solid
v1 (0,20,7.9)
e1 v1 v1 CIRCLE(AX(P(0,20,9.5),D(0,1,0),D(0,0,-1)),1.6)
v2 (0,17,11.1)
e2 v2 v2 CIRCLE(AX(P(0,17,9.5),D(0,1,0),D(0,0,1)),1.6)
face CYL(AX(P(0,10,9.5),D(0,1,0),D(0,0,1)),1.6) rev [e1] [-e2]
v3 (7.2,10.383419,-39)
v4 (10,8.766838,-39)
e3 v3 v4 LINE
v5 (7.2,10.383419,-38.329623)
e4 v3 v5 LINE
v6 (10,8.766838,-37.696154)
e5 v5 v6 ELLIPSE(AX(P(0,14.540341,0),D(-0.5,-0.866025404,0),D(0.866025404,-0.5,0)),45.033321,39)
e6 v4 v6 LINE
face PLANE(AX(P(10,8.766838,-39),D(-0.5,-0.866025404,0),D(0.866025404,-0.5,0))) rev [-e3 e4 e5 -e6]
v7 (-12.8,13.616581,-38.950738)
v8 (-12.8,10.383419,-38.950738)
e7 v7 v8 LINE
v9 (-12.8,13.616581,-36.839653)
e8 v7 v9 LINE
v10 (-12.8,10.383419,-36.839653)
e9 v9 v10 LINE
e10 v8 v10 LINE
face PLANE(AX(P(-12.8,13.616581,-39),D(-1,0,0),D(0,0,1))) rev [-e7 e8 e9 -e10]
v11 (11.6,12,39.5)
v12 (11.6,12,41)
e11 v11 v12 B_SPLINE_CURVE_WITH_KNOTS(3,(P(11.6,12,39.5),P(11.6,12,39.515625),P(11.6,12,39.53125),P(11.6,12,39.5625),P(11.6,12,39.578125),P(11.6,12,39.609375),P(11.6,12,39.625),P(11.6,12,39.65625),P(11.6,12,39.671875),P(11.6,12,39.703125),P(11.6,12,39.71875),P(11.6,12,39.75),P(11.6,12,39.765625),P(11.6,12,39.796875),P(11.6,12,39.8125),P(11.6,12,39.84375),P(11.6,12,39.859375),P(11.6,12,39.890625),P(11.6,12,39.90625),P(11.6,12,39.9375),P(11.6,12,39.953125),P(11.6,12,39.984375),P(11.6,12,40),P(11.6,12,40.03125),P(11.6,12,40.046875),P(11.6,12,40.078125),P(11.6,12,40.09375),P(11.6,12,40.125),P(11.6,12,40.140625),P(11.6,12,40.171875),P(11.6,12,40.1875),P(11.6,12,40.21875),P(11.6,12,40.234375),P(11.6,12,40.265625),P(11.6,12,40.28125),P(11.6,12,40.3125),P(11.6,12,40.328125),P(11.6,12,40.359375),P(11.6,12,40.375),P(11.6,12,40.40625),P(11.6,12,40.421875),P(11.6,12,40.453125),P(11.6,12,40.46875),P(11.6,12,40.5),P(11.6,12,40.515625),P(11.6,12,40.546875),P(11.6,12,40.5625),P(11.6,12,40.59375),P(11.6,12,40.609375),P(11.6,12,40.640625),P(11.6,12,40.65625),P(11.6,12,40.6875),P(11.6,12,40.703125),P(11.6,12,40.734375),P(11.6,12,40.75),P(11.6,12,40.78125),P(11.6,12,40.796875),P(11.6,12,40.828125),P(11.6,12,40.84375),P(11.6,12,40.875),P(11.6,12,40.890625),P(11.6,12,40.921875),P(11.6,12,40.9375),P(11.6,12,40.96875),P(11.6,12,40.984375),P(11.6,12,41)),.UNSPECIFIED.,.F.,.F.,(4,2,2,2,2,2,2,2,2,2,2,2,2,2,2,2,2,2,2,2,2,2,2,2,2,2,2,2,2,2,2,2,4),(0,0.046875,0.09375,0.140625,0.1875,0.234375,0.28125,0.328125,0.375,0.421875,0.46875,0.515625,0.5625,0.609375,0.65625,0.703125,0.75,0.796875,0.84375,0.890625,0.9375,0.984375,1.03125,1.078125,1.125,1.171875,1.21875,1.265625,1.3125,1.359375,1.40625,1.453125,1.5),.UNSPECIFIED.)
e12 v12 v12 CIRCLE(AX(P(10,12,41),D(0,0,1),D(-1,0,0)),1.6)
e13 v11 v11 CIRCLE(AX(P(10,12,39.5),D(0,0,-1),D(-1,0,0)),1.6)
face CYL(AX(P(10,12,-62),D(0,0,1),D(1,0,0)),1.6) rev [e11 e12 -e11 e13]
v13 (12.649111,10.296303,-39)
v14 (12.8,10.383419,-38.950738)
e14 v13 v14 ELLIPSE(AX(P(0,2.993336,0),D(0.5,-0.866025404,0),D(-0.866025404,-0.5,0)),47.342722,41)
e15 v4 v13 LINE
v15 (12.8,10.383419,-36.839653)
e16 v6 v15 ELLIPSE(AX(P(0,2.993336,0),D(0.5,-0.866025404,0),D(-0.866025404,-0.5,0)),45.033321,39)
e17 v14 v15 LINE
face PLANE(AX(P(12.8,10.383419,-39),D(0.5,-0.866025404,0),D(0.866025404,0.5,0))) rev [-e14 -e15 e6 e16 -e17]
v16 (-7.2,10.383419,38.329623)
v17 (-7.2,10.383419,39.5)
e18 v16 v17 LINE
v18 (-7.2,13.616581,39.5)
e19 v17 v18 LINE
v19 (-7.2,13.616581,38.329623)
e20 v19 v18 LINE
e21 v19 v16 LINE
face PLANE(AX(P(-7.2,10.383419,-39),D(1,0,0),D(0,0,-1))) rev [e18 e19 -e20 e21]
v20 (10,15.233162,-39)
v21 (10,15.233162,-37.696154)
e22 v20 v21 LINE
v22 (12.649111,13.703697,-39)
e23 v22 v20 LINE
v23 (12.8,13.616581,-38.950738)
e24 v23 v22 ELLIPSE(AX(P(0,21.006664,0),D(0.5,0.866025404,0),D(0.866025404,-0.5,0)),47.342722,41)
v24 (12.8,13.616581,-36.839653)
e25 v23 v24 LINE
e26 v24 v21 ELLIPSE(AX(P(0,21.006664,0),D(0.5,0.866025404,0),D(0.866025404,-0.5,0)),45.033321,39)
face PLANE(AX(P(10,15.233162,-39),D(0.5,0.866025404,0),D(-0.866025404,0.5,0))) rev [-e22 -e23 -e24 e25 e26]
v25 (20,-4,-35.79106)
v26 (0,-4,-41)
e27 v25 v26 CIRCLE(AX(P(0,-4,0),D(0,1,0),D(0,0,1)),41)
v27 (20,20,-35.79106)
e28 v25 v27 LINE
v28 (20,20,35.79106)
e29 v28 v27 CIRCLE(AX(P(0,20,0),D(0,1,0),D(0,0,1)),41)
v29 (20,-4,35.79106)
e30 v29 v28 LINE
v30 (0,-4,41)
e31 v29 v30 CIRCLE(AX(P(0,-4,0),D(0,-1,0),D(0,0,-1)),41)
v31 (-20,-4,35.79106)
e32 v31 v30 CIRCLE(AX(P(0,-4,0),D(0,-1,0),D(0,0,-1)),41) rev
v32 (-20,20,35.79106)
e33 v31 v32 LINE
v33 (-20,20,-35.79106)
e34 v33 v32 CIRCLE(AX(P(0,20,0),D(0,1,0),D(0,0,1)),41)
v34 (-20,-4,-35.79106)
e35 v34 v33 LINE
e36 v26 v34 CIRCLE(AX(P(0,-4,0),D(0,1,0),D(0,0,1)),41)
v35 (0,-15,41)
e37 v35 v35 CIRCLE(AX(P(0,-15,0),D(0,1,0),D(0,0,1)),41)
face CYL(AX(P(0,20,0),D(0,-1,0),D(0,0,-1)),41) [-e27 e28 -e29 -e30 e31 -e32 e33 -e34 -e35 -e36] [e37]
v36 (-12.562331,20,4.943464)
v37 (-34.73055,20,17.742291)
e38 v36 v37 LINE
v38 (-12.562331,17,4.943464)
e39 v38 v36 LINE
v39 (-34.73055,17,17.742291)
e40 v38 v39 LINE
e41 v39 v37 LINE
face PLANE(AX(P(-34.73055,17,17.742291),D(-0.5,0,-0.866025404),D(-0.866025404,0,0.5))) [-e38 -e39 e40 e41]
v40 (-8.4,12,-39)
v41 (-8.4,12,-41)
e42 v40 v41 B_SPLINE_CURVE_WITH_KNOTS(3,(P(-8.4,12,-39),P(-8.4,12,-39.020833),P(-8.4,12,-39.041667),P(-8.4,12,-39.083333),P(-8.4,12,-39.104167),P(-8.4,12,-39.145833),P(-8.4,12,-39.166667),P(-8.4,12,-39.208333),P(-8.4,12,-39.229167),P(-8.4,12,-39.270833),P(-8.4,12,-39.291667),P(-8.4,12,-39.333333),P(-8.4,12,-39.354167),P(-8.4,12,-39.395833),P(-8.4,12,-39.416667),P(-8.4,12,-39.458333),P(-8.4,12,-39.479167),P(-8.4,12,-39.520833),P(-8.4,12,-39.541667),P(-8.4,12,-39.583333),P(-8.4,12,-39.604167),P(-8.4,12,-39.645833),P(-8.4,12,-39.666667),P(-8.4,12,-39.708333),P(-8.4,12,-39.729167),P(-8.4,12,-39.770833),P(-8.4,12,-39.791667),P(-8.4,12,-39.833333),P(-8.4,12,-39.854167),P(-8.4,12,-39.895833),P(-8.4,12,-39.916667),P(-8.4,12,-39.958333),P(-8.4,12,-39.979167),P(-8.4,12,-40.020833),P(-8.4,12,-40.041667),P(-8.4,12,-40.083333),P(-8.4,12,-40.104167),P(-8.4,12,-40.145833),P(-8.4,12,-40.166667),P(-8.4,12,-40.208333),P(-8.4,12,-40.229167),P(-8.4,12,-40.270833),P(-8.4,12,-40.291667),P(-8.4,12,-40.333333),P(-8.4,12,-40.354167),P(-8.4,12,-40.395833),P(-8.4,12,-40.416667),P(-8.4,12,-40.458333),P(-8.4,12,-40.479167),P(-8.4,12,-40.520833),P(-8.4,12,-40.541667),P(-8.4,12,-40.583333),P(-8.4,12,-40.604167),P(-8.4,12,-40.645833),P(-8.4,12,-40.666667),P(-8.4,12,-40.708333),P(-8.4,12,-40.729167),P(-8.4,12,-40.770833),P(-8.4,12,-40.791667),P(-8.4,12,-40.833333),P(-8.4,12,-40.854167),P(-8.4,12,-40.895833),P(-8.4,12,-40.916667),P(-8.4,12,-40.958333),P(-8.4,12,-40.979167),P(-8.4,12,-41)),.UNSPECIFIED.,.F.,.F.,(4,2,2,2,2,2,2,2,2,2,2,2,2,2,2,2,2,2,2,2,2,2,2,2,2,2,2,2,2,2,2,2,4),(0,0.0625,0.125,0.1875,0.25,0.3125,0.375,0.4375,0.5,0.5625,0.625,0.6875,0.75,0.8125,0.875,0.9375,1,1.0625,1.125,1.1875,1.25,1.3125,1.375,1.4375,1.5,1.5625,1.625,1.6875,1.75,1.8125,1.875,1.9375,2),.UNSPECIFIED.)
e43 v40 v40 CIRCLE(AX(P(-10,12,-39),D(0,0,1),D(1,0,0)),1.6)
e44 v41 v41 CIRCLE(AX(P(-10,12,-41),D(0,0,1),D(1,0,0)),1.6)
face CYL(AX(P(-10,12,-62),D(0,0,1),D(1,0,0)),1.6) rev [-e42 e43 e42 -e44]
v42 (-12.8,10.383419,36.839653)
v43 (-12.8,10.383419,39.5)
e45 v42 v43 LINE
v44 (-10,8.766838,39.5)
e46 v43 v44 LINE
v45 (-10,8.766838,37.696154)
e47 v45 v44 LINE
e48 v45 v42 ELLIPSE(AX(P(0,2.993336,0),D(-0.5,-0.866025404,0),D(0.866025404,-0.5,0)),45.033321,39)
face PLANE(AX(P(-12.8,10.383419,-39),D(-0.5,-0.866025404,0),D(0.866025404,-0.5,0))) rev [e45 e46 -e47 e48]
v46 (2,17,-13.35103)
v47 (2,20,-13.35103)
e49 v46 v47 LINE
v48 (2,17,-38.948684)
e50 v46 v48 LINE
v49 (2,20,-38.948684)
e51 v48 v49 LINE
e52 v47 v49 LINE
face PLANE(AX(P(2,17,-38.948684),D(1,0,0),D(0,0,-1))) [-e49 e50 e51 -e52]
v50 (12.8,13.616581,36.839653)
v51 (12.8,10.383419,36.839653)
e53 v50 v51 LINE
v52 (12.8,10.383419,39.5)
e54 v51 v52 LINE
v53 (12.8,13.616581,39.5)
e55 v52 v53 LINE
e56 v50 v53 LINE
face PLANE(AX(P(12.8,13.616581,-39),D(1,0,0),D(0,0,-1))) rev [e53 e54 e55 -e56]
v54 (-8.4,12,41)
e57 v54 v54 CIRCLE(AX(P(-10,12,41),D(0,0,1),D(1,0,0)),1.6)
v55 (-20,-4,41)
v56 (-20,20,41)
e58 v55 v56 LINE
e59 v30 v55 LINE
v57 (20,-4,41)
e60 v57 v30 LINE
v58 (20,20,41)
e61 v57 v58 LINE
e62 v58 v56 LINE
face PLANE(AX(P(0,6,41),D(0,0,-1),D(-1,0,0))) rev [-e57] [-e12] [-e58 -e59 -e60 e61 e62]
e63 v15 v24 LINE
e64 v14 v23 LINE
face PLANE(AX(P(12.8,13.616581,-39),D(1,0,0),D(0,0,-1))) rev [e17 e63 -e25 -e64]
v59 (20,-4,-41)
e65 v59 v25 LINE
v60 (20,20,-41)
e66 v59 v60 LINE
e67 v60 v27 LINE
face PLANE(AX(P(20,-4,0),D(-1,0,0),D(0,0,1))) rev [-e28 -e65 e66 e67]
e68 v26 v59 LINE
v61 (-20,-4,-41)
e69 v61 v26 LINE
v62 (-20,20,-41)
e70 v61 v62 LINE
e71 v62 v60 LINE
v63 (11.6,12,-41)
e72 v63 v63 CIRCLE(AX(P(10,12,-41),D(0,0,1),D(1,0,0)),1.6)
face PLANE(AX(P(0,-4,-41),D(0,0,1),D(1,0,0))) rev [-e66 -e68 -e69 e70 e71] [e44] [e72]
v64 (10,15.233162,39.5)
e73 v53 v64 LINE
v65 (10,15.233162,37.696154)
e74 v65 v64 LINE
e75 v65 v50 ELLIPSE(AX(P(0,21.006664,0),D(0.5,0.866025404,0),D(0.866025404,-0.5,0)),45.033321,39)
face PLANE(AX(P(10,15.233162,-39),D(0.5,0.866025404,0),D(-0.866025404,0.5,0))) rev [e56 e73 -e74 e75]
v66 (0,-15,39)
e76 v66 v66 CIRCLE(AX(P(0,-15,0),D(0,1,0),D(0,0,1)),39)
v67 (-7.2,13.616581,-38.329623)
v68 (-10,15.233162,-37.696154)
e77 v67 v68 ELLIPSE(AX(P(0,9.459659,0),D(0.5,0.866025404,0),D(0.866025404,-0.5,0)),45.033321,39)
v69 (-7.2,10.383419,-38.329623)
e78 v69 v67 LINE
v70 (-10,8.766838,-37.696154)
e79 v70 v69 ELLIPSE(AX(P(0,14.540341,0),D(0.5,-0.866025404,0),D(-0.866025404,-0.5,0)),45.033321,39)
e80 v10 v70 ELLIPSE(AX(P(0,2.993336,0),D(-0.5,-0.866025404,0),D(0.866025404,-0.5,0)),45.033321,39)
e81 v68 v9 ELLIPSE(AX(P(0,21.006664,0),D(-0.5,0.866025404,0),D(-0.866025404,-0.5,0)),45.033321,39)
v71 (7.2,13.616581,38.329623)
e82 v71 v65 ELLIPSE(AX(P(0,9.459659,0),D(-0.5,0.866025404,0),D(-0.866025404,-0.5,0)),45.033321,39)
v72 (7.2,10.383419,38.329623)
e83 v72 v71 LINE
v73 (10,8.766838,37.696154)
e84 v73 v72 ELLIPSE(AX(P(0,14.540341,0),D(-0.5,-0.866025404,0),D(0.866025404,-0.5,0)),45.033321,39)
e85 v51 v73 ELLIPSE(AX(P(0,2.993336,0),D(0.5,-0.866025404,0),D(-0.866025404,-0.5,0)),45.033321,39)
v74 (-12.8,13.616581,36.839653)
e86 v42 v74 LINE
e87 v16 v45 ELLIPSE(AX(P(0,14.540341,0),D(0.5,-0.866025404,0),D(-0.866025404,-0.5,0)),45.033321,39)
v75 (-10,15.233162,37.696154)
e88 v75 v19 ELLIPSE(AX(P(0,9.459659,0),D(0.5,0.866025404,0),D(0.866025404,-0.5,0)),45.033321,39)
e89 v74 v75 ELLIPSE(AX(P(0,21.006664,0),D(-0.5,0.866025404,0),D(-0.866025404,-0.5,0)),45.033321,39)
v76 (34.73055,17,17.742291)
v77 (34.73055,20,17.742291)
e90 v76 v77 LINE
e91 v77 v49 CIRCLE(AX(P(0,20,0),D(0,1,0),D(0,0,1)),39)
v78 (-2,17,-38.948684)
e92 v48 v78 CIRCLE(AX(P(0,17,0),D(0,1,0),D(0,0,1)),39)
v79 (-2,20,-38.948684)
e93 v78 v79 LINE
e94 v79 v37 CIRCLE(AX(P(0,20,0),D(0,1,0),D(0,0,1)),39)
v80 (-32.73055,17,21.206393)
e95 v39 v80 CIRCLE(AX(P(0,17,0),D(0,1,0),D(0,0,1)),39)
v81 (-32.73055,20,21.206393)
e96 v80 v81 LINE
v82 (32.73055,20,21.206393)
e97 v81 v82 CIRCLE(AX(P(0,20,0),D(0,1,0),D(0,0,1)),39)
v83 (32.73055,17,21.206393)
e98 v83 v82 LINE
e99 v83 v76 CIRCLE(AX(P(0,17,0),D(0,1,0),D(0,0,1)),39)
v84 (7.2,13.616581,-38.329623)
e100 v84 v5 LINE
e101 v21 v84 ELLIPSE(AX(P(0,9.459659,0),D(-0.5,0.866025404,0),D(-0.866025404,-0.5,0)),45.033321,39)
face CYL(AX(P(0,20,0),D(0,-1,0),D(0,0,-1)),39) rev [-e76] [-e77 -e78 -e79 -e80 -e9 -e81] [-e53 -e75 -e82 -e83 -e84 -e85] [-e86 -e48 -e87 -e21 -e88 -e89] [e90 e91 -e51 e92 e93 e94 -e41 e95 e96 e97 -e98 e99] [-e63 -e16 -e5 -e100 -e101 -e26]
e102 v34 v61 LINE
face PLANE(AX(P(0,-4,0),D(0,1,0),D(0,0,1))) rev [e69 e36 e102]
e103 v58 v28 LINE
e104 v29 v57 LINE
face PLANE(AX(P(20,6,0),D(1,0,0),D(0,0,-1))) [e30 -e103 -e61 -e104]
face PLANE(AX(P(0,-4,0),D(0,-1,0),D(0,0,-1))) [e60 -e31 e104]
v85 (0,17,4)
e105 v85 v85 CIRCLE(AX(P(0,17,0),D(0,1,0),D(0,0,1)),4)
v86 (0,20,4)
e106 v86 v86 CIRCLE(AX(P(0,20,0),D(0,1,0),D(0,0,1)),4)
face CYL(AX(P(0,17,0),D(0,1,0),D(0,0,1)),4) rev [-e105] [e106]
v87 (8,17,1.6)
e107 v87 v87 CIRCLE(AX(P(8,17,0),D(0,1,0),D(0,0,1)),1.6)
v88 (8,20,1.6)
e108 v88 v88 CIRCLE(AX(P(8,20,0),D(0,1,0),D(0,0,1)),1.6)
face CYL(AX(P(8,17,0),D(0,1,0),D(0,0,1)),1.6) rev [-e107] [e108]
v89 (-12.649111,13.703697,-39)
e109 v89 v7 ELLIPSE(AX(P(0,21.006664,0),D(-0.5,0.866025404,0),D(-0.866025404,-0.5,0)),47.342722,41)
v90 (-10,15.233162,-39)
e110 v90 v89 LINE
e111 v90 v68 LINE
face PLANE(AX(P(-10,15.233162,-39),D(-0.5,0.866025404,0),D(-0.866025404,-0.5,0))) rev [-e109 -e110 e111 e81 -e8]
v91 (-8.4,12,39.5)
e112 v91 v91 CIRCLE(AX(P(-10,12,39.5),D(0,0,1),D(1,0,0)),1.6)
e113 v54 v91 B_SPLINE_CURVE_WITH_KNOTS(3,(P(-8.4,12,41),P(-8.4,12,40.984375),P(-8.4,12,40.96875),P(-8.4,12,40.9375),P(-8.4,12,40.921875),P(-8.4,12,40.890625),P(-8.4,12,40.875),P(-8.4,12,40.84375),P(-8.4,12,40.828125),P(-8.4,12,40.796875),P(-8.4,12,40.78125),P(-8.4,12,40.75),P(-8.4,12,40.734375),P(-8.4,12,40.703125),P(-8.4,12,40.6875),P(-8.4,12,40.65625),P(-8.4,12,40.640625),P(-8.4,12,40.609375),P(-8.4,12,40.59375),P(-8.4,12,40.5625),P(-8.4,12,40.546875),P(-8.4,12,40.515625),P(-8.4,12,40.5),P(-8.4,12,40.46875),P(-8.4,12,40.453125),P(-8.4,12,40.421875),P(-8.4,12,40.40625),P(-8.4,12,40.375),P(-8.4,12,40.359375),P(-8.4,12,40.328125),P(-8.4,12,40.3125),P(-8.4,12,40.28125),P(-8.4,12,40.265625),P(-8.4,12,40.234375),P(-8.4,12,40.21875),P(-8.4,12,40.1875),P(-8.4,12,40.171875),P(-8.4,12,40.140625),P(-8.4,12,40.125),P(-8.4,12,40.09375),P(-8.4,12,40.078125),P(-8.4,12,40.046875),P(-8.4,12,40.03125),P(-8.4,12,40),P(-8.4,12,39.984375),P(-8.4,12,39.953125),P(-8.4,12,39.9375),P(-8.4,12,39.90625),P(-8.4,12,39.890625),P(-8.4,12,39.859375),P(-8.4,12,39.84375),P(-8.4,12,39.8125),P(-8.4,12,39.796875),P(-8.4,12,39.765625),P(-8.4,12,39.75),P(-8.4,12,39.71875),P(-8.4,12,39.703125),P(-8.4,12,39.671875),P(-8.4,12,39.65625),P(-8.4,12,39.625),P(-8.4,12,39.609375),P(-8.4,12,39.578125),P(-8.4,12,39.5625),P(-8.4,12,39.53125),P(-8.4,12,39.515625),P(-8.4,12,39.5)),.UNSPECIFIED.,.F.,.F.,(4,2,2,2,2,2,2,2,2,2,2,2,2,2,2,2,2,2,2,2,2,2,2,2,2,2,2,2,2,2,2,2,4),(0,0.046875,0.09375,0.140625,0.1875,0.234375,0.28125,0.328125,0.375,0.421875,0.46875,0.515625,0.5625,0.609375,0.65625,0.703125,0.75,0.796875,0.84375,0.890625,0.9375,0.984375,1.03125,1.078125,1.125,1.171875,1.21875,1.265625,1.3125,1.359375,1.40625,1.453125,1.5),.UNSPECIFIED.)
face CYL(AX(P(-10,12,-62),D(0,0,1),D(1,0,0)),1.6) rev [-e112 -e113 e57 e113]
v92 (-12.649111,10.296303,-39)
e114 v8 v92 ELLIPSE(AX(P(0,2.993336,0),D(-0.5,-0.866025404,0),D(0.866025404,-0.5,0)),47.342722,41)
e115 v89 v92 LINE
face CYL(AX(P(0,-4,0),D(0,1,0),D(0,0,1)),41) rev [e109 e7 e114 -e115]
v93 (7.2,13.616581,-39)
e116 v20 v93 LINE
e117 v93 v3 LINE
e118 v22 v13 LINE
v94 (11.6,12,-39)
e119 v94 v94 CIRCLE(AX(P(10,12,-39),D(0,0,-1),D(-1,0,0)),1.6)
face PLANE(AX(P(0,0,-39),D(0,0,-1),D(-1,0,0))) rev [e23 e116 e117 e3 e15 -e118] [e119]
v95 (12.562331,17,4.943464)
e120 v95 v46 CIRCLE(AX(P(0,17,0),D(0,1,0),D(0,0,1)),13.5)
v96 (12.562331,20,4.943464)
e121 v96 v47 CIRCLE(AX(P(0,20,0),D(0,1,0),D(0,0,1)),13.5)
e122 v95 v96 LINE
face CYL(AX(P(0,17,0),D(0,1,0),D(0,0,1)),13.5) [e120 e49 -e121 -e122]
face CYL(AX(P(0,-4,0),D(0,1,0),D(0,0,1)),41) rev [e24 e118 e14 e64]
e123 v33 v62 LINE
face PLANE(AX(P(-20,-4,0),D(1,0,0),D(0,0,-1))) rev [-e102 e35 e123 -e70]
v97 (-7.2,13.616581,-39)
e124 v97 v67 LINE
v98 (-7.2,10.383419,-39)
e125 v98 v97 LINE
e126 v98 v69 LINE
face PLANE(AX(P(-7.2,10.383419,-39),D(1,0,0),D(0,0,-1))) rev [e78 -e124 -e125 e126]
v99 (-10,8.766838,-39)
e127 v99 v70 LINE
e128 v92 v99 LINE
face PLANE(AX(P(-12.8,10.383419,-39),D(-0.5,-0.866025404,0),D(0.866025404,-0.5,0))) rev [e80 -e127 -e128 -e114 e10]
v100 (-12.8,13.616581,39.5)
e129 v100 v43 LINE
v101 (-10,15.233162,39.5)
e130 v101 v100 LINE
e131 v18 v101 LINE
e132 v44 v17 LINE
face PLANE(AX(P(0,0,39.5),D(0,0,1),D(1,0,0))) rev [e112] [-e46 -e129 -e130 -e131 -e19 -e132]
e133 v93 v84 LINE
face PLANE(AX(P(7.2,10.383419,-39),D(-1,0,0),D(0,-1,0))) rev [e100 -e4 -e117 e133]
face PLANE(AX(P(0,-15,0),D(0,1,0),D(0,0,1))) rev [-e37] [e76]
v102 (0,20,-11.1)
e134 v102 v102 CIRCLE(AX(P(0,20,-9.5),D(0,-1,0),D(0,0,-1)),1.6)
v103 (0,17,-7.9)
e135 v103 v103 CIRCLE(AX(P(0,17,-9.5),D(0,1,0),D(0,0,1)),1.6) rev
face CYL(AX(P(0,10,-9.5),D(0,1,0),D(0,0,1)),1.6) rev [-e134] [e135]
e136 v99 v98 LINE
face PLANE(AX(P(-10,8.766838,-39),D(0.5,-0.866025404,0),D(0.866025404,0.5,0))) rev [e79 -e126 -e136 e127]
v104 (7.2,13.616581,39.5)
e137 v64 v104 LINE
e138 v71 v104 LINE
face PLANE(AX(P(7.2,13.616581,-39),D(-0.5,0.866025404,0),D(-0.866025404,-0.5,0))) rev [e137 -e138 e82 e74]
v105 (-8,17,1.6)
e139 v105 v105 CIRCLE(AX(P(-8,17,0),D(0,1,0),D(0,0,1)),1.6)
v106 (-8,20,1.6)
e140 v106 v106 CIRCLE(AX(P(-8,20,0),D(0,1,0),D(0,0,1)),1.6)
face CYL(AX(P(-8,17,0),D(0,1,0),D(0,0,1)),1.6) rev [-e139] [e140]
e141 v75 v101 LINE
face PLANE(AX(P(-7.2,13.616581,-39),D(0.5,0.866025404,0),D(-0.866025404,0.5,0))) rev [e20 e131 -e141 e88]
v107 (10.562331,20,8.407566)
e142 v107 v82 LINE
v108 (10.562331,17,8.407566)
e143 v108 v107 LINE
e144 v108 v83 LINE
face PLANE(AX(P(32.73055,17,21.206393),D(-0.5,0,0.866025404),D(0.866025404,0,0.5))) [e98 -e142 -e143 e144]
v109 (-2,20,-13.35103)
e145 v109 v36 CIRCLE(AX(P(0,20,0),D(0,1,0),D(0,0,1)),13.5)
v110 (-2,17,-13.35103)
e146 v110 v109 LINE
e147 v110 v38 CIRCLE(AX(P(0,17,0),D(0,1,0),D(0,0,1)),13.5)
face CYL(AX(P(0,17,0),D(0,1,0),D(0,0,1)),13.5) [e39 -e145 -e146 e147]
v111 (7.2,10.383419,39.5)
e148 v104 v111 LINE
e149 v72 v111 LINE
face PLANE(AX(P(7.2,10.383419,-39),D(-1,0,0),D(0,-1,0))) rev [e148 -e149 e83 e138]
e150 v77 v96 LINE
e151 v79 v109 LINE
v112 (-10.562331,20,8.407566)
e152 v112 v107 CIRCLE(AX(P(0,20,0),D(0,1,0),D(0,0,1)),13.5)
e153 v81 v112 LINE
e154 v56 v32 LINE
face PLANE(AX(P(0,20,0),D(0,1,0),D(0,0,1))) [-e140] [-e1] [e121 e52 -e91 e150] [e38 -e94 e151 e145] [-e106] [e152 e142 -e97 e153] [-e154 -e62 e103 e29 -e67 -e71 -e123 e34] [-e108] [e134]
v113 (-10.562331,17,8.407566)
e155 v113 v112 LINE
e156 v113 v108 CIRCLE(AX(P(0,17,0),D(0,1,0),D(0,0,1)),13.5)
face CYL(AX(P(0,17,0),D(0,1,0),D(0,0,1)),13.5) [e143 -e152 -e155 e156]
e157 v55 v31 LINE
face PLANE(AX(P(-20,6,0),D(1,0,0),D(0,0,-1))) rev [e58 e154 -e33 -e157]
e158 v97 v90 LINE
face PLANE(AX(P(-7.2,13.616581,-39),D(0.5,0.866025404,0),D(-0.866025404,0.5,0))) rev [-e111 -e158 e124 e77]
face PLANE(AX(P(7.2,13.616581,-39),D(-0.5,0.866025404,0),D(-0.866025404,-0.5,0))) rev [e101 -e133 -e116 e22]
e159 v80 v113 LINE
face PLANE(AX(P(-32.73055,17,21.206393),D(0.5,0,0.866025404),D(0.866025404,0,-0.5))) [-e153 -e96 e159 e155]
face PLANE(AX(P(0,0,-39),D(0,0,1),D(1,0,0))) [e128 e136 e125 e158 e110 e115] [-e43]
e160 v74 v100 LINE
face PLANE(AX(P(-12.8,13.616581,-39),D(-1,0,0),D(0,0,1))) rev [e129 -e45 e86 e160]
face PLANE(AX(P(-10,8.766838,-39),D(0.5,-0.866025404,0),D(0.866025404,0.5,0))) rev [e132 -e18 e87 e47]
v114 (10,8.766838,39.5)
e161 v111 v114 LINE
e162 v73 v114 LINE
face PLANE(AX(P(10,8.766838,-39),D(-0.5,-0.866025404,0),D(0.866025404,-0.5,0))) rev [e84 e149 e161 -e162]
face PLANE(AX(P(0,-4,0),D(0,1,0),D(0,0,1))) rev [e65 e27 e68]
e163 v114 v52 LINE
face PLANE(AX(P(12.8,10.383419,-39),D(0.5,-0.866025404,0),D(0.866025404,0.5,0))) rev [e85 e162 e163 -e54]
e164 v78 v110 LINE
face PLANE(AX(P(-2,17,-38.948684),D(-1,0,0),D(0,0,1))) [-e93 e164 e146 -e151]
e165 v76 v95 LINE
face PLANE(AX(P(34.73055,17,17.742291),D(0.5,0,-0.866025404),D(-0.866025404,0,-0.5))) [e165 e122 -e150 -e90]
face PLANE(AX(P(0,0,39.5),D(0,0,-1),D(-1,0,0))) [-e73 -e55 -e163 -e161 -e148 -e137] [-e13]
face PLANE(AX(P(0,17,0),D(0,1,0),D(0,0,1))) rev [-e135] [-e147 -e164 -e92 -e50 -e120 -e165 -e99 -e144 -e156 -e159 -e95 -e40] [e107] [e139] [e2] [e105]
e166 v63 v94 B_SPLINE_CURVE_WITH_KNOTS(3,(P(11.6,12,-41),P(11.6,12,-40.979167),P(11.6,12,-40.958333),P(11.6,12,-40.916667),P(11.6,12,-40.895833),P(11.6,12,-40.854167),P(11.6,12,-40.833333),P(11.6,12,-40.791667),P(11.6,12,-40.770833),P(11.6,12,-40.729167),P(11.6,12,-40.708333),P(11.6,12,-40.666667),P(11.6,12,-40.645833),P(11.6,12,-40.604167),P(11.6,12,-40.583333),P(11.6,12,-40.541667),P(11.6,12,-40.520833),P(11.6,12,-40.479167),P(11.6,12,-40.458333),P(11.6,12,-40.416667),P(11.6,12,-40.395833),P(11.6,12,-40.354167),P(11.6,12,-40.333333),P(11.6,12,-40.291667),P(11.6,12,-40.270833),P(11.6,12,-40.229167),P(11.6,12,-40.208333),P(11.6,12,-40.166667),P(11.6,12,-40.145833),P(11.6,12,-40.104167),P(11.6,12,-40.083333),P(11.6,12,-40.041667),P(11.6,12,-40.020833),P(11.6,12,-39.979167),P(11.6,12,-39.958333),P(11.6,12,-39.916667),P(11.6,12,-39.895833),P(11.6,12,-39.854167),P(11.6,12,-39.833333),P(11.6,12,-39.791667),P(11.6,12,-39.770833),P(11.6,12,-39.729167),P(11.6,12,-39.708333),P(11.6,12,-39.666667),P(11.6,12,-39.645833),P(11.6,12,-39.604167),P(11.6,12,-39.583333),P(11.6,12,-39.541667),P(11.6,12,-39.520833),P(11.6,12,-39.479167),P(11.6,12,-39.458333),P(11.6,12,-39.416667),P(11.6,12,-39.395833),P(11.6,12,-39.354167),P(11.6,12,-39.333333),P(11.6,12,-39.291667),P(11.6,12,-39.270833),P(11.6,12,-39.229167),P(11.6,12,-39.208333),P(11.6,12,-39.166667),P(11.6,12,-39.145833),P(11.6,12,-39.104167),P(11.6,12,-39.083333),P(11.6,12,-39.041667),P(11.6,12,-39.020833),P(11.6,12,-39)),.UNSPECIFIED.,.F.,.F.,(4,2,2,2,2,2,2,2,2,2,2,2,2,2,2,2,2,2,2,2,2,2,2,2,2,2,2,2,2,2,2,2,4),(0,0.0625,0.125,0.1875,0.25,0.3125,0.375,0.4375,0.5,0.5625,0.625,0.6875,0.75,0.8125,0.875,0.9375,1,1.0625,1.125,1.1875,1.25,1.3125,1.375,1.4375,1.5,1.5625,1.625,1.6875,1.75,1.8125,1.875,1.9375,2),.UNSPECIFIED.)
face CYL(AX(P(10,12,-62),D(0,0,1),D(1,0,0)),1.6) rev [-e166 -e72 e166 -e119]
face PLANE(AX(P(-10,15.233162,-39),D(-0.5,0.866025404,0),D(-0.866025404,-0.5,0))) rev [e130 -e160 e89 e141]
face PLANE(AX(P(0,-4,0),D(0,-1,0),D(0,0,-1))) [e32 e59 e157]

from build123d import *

# Parameters (mm, degrees)
SKETCH_1_R           = 41
SKETCH_1_R_2         = 39
EXTRUDE_1_DEPTH      = 20
EXTRUDE_START        = -14
EXTRUDE_2_DEPTH      = 14
EXTRUDE_START_2      = -3
SKETCH_3_R           = 4
SKETCH_3_R_2         = 1.6
EXTRUDE_3_DEPTH      = 3
CUT_EXTRUDE_3_DEPTH  = 3
EXTRUDE_5_DEPTH      = 10
EXTRUDE_5_DEPTH_BACK = 15
SKETCH_1_2_R         = 41
SKETCH_1_2_R_2       = 39
EXTRUDE_START_3      = 10
EXTRUDE_7_DEPTH      = 10
EXTRUDE_8_DEPTH      = 10
EXTRUDE_8_DEPTH_BACK = 5
CUT_EXTRUDE_4_DEPTH  = 80
EXTRUDE_START_4      = -24
EXTRUDE_10_DEPTH     = 24
EXTRUDE_9_DEPTH      = 10
EXTRUDE_9_DEPTH_BACK = 1.5
CUT_EXTRUDE_6_DEPTH  = 10
SKETCH_16_R          = 1.6
CUT_EXTRUDE_7_DEPTH  = 103
SKETCH_18_R          = 1.6
CUT_EXTRUDE_8_DEPTH  = 10
SKETCH_18_4_R        = 1.6
CUT_EXTRUDE_9_DEPTH  = 10


with BuildPart() as part:
    # 草图1 → 凸台-拉伸1 (new body)
    with BuildSketch(Plane(origin=(0, 0, 0), x_dir=(1, 0, 0), z_dir=(0, 1, 0))):
        Circle(SKETCH_1_R)
        Circle(SKETCH_1_R_2, mode=Mode.SUBTRACT)
    extrude(amount=EXTRUDE_1_DEPTH)

    # 草图2 → 凸台-拉伸2 (add)
    with BuildSketch(Plane(origin=(0, 20, 0), x_dir=(1, 0, 0), z_dir=(0, 1, 0)).offset(EXTRUDE_START)):
        with BuildLine():
            Line((3.5e-08, -41), (20, -41))
            Line((20, -41), (20, -35.791060336))
            ThreePointArc((20, -35.791060336), (10.333598766, -39.676400247), (3.5e-08, -41))
        make_face()
        with BuildLine():
            Line((-20, -41), (3.5e-08, -41))
            ThreePointArc((3.5e-08, -41), (-10.333598732, -39.676400256), (-20, -35.791060336))
            Line((-20, -35.791060336), (-20, -41))
        make_face()
    extrude(amount=EXTRUDE_2_DEPTH)

    # 草图3 → 凸台-拉伸3 (add)
    with BuildSketch(Plane(origin=(0, 20, 0), x_dir=(1, 0, 0), z_dir=(0, 1, 0)).offset(EXTRUDE_START_2)):
        with BuildLine():
            Line((-2, 38.948684188), (-2, 13.351029923))
            ThreePointArc((-2, 13.351029923), (-11.691342951, 6.75), (-12.56233108, -4.943464154))
            Line((-12.56233108, -4.943464154), (-34.730549951, -17.742291287))
            ThreePointArc((-34.730549951, -17.742291287), (-33.774990748, -19.5), (-32.730549951, -21.206392902))
            Line((-32.730549951, -21.206392902), (-10.56233108, -8.407565769))
            ThreePointArc((-10.56233108, -8.407565769), (0, -13.5), (10.56233108, -8.407565769))
            Line((10.56233108, -8.407565769), (32.730549951, -21.206392902))
            ThreePointArc((32.730549951, -21.206392902), (33.774990748, -19.5), (34.730549951, -17.742291287))
            Line((34.730549951, -17.742291287), (12.56233108, -4.943464154))
            ThreePointArc((12.56233108, -4.943464154), (11.691342951, 6.75), (2, 13.351029923))
            Line((2, 13.351029923), (2, 38.948684188))
            ThreePointArc((2, 38.948684188), (0, 39), (-2, 38.948684188))
        make_face()
        Circle(SKETCH_3_R, mode=Mode.SUBTRACT)
        with Locations((-8, 0)):
            Circle(SKETCH_3_R_2, mode=Mode.SUBTRACT)
        with Locations((8, 0)):
            Circle(SKETCH_3_R_2, mode=Mode.SUBTRACT)
    extrude(amount=EXTRUDE_3_DEPTH)

    # 草图7 → 切除-拉伸3 (cut)
    with BuildSketch(Plane.XZ.offset(-6)):
        with BuildLine():
            Line((0, 41), (-20, 41))
            Line((-20, 41), (-20, 35.791060336))
            ThreePointArc((-20, 35.791060336), (-10.333598749, 39.676400251), (0, 41))
        make_face()
        with BuildLine():
            Line((20, 41), (0, 41))
            ThreePointArc((0, 41), (10.333598749, 39.676400251), (20, 35.791060336))
            Line((20, 35.791060336), (20, 41))
        make_face()
    extrude(amount=-CUT_EXTRUDE_3_DEPTH, mode=Mode.SUBTRACT)

    # 草图1<2> → 凸台-拉伸5 (add, two sides: drawn at the far end of the back side and taken through both)
    with BuildSketch(Plane(origin=(0, 0, 0), x_dir=(1, 0, 0), z_dir=(0, 1, 0)).offset(-EXTRUDE_5_DEPTH_BACK)):
        Circle(SKETCH_1_2_R)
        Circle(SKETCH_1_2_R_2, mode=Mode.SUBTRACT)
    extrude(amount=EXTRUDE_5_DEPTH + EXTRUDE_5_DEPTH_BACK)

    # 草图7<4> → 凸台-拉伸7 (add)
    with BuildSketch(Plane.XZ.offset(-6).offset(EXTRUDE_START_3)):
        with BuildLine():
            Line((0, 41), (-20, 41))
            Line((-20, 41), (-20, 35.791060336))
            ThreePointArc((-20, 35.791060336), (-10.333598749, 39.676400251), (0, 41))
        make_face()
        with BuildLine():
            Line((20, 41), (0, 41))
            ThreePointArc((0, 41), (10.333598749, 39.676400251), (20, 35.791060336))
            Line((20, 35.791060336), (20, 41))
        make_face()
    extrude(amount=-EXTRUDE_7_DEPTH)

    # 草图7<5> → 凸台-拉伸8 (add, two sides: drawn at the far end of the back side and taken through both)
    with BuildSketch(Plane.XZ.offset(-6).offset(-EXTRUDE_8_DEPTH_BACK)):
        with BuildLine():
            Line((0, 41), (-20, 41))
            Line((-20, 41), (-20, 35.791060336))
            ThreePointArc((-20, 35.791060336), (-10.333598749, 39.676400251), (0, 41))
        make_face()
        with BuildLine():
            Line((20, 41), (0, 41))
            ThreePointArc((0, 41), (10.333598749, 39.676400251), (20, 35.791060336))
            Line((20, 35.791060336), (20, 41))
        make_face()
    extrude(amount=EXTRUDE_8_DEPTH + EXTRUDE_8_DEPTH_BACK)

    # 草图4 → 切除-拉伸4 (cut)
    with BuildSketch(Plane.XY.offset(41)):
        Polygon((-10, 8.766838493), (-7.2, 10.383419246), (-7.2, 13.616580754), (-10, 15.233161507), (-12.8, 13.616580754), (-12.8, 10.383419246), align=None)
        Polygon((12.8, 10.383419246), (10, 8.766838493), (7.2, 10.383419246), (7.2, 13.616580754), (10, 15.233161507), (12.8, 13.616580754), align=None)
    extrude(amount=-CUT_EXTRUDE_4_DEPTH, mode=Mode.SUBTRACT)

    # 草图20 → 凸台-拉伸10 (add)
    with BuildSketch(Plane(origin=(0, 20, 0), x_dir=(1, 0, 0), z_dir=(0, 1, 0)).offset(EXTRUDE_START_4)):
        with BuildLine():
            Line((20, 41), (1.85e-07, 41))
            ThreePointArc((1.85e-07, 41), (10.333598839, 39.676400228), (20, 35.791060336))
            Line((20, 35.791060336), (20, 41))
        make_face()
        with BuildLine():
            Line((-20, 41), (-20, 35.791060336))
            ThreePointArc((-20, 35.791060336), (-10.333598659, 39.676400275), (1.85e-07, 41))
            Line((1.85e-07, 41), (-20, 41))
        make_face()
    extrude(amount=EXTRUDE_10_DEPTH)

    # 草图4<3> → 凸台-拉伸9 (add, two sides: drawn at the far end of the back side and taken through both)
    with BuildSketch(Plane.XY.offset(41).offset(-EXTRUDE_9_DEPTH_BACK)):
        Polygon((-10, 8.766838493), (-7.2, 10.383419246), (-7.2, 13.616580754), (-10, 15.233161507), (-12.8, 13.616580754), (-12.8, 10.383419246), align=None)
        Polygon((12.8, 10.383419246), (10, 8.766838493), (7.2, 10.383419246), (7.2, 13.616580754), (10, 15.233161507), (12.8, 13.616580754), align=None)
    extrude(amount=EXTRUDE_9_DEPTH + EXTRUDE_9_DEPTH_BACK)

    # 草图13 → 切除-拉伸6 (cut)
    with BuildSketch(Plane.XY.offset(51)):
        Polygon((10, 15.233161507), (7.2, 13.616580754), (7.2, 10.383419246), (10, 8.766838493), (12.8, 10.383419246), (12.8, 13.616580754), align=None)
        Polygon((-10, 15.233161507), (-12.8, 13.616580754), (-12.8, 10.383419246), (-10, 8.766838493), (-7.2, 10.383419246), (-7.2, 13.616580754), align=None)
    extrude(amount=-CUT_EXTRUDE_6_DEPTH, mode=Mode.SUBTRACT)

    # 草图16 → 切除-拉伸7 (cut)
    with BuildSketch(Plane.XY.offset(41)):
        with Locations((-10, 12)):
            Circle(SKETCH_16_R)
        with Locations((10, 12)):
            Circle(SKETCH_16_R)
    extrude(amount=-CUT_EXTRUDE_7_DEPTH, mode=Mode.SUBTRACT)

    # 草图18 → 切除-拉伸8 (cut)
    with BuildSketch(Plane(origin=(0, 20, 0), x_dir=(1, 0, 0), z_dir=(0, 1, 0))):
        with Locations((0, 9.5)):
            Circle(SKETCH_18_R)
    extrude(amount=-CUT_EXTRUDE_8_DEPTH, mode=Mode.SUBTRACT)

    # 草图18<4> → 切除-拉伸9 (cut)
    with BuildSketch(Plane(origin=(0, 20, 0), x_dir=(1, 0, 0), z_dir=(0, 1, 0))):
        with Locations((0, 9.5)):
            Circle(SKETCH_18_4_R)
        with Locations((0, -9.5)):
            Circle(SKETCH_18_4_R)
    extrude(amount=-CUT_EXTRUDE_9_DEPTH, mode=Mode.SUBTRACT)


solid = part.part
